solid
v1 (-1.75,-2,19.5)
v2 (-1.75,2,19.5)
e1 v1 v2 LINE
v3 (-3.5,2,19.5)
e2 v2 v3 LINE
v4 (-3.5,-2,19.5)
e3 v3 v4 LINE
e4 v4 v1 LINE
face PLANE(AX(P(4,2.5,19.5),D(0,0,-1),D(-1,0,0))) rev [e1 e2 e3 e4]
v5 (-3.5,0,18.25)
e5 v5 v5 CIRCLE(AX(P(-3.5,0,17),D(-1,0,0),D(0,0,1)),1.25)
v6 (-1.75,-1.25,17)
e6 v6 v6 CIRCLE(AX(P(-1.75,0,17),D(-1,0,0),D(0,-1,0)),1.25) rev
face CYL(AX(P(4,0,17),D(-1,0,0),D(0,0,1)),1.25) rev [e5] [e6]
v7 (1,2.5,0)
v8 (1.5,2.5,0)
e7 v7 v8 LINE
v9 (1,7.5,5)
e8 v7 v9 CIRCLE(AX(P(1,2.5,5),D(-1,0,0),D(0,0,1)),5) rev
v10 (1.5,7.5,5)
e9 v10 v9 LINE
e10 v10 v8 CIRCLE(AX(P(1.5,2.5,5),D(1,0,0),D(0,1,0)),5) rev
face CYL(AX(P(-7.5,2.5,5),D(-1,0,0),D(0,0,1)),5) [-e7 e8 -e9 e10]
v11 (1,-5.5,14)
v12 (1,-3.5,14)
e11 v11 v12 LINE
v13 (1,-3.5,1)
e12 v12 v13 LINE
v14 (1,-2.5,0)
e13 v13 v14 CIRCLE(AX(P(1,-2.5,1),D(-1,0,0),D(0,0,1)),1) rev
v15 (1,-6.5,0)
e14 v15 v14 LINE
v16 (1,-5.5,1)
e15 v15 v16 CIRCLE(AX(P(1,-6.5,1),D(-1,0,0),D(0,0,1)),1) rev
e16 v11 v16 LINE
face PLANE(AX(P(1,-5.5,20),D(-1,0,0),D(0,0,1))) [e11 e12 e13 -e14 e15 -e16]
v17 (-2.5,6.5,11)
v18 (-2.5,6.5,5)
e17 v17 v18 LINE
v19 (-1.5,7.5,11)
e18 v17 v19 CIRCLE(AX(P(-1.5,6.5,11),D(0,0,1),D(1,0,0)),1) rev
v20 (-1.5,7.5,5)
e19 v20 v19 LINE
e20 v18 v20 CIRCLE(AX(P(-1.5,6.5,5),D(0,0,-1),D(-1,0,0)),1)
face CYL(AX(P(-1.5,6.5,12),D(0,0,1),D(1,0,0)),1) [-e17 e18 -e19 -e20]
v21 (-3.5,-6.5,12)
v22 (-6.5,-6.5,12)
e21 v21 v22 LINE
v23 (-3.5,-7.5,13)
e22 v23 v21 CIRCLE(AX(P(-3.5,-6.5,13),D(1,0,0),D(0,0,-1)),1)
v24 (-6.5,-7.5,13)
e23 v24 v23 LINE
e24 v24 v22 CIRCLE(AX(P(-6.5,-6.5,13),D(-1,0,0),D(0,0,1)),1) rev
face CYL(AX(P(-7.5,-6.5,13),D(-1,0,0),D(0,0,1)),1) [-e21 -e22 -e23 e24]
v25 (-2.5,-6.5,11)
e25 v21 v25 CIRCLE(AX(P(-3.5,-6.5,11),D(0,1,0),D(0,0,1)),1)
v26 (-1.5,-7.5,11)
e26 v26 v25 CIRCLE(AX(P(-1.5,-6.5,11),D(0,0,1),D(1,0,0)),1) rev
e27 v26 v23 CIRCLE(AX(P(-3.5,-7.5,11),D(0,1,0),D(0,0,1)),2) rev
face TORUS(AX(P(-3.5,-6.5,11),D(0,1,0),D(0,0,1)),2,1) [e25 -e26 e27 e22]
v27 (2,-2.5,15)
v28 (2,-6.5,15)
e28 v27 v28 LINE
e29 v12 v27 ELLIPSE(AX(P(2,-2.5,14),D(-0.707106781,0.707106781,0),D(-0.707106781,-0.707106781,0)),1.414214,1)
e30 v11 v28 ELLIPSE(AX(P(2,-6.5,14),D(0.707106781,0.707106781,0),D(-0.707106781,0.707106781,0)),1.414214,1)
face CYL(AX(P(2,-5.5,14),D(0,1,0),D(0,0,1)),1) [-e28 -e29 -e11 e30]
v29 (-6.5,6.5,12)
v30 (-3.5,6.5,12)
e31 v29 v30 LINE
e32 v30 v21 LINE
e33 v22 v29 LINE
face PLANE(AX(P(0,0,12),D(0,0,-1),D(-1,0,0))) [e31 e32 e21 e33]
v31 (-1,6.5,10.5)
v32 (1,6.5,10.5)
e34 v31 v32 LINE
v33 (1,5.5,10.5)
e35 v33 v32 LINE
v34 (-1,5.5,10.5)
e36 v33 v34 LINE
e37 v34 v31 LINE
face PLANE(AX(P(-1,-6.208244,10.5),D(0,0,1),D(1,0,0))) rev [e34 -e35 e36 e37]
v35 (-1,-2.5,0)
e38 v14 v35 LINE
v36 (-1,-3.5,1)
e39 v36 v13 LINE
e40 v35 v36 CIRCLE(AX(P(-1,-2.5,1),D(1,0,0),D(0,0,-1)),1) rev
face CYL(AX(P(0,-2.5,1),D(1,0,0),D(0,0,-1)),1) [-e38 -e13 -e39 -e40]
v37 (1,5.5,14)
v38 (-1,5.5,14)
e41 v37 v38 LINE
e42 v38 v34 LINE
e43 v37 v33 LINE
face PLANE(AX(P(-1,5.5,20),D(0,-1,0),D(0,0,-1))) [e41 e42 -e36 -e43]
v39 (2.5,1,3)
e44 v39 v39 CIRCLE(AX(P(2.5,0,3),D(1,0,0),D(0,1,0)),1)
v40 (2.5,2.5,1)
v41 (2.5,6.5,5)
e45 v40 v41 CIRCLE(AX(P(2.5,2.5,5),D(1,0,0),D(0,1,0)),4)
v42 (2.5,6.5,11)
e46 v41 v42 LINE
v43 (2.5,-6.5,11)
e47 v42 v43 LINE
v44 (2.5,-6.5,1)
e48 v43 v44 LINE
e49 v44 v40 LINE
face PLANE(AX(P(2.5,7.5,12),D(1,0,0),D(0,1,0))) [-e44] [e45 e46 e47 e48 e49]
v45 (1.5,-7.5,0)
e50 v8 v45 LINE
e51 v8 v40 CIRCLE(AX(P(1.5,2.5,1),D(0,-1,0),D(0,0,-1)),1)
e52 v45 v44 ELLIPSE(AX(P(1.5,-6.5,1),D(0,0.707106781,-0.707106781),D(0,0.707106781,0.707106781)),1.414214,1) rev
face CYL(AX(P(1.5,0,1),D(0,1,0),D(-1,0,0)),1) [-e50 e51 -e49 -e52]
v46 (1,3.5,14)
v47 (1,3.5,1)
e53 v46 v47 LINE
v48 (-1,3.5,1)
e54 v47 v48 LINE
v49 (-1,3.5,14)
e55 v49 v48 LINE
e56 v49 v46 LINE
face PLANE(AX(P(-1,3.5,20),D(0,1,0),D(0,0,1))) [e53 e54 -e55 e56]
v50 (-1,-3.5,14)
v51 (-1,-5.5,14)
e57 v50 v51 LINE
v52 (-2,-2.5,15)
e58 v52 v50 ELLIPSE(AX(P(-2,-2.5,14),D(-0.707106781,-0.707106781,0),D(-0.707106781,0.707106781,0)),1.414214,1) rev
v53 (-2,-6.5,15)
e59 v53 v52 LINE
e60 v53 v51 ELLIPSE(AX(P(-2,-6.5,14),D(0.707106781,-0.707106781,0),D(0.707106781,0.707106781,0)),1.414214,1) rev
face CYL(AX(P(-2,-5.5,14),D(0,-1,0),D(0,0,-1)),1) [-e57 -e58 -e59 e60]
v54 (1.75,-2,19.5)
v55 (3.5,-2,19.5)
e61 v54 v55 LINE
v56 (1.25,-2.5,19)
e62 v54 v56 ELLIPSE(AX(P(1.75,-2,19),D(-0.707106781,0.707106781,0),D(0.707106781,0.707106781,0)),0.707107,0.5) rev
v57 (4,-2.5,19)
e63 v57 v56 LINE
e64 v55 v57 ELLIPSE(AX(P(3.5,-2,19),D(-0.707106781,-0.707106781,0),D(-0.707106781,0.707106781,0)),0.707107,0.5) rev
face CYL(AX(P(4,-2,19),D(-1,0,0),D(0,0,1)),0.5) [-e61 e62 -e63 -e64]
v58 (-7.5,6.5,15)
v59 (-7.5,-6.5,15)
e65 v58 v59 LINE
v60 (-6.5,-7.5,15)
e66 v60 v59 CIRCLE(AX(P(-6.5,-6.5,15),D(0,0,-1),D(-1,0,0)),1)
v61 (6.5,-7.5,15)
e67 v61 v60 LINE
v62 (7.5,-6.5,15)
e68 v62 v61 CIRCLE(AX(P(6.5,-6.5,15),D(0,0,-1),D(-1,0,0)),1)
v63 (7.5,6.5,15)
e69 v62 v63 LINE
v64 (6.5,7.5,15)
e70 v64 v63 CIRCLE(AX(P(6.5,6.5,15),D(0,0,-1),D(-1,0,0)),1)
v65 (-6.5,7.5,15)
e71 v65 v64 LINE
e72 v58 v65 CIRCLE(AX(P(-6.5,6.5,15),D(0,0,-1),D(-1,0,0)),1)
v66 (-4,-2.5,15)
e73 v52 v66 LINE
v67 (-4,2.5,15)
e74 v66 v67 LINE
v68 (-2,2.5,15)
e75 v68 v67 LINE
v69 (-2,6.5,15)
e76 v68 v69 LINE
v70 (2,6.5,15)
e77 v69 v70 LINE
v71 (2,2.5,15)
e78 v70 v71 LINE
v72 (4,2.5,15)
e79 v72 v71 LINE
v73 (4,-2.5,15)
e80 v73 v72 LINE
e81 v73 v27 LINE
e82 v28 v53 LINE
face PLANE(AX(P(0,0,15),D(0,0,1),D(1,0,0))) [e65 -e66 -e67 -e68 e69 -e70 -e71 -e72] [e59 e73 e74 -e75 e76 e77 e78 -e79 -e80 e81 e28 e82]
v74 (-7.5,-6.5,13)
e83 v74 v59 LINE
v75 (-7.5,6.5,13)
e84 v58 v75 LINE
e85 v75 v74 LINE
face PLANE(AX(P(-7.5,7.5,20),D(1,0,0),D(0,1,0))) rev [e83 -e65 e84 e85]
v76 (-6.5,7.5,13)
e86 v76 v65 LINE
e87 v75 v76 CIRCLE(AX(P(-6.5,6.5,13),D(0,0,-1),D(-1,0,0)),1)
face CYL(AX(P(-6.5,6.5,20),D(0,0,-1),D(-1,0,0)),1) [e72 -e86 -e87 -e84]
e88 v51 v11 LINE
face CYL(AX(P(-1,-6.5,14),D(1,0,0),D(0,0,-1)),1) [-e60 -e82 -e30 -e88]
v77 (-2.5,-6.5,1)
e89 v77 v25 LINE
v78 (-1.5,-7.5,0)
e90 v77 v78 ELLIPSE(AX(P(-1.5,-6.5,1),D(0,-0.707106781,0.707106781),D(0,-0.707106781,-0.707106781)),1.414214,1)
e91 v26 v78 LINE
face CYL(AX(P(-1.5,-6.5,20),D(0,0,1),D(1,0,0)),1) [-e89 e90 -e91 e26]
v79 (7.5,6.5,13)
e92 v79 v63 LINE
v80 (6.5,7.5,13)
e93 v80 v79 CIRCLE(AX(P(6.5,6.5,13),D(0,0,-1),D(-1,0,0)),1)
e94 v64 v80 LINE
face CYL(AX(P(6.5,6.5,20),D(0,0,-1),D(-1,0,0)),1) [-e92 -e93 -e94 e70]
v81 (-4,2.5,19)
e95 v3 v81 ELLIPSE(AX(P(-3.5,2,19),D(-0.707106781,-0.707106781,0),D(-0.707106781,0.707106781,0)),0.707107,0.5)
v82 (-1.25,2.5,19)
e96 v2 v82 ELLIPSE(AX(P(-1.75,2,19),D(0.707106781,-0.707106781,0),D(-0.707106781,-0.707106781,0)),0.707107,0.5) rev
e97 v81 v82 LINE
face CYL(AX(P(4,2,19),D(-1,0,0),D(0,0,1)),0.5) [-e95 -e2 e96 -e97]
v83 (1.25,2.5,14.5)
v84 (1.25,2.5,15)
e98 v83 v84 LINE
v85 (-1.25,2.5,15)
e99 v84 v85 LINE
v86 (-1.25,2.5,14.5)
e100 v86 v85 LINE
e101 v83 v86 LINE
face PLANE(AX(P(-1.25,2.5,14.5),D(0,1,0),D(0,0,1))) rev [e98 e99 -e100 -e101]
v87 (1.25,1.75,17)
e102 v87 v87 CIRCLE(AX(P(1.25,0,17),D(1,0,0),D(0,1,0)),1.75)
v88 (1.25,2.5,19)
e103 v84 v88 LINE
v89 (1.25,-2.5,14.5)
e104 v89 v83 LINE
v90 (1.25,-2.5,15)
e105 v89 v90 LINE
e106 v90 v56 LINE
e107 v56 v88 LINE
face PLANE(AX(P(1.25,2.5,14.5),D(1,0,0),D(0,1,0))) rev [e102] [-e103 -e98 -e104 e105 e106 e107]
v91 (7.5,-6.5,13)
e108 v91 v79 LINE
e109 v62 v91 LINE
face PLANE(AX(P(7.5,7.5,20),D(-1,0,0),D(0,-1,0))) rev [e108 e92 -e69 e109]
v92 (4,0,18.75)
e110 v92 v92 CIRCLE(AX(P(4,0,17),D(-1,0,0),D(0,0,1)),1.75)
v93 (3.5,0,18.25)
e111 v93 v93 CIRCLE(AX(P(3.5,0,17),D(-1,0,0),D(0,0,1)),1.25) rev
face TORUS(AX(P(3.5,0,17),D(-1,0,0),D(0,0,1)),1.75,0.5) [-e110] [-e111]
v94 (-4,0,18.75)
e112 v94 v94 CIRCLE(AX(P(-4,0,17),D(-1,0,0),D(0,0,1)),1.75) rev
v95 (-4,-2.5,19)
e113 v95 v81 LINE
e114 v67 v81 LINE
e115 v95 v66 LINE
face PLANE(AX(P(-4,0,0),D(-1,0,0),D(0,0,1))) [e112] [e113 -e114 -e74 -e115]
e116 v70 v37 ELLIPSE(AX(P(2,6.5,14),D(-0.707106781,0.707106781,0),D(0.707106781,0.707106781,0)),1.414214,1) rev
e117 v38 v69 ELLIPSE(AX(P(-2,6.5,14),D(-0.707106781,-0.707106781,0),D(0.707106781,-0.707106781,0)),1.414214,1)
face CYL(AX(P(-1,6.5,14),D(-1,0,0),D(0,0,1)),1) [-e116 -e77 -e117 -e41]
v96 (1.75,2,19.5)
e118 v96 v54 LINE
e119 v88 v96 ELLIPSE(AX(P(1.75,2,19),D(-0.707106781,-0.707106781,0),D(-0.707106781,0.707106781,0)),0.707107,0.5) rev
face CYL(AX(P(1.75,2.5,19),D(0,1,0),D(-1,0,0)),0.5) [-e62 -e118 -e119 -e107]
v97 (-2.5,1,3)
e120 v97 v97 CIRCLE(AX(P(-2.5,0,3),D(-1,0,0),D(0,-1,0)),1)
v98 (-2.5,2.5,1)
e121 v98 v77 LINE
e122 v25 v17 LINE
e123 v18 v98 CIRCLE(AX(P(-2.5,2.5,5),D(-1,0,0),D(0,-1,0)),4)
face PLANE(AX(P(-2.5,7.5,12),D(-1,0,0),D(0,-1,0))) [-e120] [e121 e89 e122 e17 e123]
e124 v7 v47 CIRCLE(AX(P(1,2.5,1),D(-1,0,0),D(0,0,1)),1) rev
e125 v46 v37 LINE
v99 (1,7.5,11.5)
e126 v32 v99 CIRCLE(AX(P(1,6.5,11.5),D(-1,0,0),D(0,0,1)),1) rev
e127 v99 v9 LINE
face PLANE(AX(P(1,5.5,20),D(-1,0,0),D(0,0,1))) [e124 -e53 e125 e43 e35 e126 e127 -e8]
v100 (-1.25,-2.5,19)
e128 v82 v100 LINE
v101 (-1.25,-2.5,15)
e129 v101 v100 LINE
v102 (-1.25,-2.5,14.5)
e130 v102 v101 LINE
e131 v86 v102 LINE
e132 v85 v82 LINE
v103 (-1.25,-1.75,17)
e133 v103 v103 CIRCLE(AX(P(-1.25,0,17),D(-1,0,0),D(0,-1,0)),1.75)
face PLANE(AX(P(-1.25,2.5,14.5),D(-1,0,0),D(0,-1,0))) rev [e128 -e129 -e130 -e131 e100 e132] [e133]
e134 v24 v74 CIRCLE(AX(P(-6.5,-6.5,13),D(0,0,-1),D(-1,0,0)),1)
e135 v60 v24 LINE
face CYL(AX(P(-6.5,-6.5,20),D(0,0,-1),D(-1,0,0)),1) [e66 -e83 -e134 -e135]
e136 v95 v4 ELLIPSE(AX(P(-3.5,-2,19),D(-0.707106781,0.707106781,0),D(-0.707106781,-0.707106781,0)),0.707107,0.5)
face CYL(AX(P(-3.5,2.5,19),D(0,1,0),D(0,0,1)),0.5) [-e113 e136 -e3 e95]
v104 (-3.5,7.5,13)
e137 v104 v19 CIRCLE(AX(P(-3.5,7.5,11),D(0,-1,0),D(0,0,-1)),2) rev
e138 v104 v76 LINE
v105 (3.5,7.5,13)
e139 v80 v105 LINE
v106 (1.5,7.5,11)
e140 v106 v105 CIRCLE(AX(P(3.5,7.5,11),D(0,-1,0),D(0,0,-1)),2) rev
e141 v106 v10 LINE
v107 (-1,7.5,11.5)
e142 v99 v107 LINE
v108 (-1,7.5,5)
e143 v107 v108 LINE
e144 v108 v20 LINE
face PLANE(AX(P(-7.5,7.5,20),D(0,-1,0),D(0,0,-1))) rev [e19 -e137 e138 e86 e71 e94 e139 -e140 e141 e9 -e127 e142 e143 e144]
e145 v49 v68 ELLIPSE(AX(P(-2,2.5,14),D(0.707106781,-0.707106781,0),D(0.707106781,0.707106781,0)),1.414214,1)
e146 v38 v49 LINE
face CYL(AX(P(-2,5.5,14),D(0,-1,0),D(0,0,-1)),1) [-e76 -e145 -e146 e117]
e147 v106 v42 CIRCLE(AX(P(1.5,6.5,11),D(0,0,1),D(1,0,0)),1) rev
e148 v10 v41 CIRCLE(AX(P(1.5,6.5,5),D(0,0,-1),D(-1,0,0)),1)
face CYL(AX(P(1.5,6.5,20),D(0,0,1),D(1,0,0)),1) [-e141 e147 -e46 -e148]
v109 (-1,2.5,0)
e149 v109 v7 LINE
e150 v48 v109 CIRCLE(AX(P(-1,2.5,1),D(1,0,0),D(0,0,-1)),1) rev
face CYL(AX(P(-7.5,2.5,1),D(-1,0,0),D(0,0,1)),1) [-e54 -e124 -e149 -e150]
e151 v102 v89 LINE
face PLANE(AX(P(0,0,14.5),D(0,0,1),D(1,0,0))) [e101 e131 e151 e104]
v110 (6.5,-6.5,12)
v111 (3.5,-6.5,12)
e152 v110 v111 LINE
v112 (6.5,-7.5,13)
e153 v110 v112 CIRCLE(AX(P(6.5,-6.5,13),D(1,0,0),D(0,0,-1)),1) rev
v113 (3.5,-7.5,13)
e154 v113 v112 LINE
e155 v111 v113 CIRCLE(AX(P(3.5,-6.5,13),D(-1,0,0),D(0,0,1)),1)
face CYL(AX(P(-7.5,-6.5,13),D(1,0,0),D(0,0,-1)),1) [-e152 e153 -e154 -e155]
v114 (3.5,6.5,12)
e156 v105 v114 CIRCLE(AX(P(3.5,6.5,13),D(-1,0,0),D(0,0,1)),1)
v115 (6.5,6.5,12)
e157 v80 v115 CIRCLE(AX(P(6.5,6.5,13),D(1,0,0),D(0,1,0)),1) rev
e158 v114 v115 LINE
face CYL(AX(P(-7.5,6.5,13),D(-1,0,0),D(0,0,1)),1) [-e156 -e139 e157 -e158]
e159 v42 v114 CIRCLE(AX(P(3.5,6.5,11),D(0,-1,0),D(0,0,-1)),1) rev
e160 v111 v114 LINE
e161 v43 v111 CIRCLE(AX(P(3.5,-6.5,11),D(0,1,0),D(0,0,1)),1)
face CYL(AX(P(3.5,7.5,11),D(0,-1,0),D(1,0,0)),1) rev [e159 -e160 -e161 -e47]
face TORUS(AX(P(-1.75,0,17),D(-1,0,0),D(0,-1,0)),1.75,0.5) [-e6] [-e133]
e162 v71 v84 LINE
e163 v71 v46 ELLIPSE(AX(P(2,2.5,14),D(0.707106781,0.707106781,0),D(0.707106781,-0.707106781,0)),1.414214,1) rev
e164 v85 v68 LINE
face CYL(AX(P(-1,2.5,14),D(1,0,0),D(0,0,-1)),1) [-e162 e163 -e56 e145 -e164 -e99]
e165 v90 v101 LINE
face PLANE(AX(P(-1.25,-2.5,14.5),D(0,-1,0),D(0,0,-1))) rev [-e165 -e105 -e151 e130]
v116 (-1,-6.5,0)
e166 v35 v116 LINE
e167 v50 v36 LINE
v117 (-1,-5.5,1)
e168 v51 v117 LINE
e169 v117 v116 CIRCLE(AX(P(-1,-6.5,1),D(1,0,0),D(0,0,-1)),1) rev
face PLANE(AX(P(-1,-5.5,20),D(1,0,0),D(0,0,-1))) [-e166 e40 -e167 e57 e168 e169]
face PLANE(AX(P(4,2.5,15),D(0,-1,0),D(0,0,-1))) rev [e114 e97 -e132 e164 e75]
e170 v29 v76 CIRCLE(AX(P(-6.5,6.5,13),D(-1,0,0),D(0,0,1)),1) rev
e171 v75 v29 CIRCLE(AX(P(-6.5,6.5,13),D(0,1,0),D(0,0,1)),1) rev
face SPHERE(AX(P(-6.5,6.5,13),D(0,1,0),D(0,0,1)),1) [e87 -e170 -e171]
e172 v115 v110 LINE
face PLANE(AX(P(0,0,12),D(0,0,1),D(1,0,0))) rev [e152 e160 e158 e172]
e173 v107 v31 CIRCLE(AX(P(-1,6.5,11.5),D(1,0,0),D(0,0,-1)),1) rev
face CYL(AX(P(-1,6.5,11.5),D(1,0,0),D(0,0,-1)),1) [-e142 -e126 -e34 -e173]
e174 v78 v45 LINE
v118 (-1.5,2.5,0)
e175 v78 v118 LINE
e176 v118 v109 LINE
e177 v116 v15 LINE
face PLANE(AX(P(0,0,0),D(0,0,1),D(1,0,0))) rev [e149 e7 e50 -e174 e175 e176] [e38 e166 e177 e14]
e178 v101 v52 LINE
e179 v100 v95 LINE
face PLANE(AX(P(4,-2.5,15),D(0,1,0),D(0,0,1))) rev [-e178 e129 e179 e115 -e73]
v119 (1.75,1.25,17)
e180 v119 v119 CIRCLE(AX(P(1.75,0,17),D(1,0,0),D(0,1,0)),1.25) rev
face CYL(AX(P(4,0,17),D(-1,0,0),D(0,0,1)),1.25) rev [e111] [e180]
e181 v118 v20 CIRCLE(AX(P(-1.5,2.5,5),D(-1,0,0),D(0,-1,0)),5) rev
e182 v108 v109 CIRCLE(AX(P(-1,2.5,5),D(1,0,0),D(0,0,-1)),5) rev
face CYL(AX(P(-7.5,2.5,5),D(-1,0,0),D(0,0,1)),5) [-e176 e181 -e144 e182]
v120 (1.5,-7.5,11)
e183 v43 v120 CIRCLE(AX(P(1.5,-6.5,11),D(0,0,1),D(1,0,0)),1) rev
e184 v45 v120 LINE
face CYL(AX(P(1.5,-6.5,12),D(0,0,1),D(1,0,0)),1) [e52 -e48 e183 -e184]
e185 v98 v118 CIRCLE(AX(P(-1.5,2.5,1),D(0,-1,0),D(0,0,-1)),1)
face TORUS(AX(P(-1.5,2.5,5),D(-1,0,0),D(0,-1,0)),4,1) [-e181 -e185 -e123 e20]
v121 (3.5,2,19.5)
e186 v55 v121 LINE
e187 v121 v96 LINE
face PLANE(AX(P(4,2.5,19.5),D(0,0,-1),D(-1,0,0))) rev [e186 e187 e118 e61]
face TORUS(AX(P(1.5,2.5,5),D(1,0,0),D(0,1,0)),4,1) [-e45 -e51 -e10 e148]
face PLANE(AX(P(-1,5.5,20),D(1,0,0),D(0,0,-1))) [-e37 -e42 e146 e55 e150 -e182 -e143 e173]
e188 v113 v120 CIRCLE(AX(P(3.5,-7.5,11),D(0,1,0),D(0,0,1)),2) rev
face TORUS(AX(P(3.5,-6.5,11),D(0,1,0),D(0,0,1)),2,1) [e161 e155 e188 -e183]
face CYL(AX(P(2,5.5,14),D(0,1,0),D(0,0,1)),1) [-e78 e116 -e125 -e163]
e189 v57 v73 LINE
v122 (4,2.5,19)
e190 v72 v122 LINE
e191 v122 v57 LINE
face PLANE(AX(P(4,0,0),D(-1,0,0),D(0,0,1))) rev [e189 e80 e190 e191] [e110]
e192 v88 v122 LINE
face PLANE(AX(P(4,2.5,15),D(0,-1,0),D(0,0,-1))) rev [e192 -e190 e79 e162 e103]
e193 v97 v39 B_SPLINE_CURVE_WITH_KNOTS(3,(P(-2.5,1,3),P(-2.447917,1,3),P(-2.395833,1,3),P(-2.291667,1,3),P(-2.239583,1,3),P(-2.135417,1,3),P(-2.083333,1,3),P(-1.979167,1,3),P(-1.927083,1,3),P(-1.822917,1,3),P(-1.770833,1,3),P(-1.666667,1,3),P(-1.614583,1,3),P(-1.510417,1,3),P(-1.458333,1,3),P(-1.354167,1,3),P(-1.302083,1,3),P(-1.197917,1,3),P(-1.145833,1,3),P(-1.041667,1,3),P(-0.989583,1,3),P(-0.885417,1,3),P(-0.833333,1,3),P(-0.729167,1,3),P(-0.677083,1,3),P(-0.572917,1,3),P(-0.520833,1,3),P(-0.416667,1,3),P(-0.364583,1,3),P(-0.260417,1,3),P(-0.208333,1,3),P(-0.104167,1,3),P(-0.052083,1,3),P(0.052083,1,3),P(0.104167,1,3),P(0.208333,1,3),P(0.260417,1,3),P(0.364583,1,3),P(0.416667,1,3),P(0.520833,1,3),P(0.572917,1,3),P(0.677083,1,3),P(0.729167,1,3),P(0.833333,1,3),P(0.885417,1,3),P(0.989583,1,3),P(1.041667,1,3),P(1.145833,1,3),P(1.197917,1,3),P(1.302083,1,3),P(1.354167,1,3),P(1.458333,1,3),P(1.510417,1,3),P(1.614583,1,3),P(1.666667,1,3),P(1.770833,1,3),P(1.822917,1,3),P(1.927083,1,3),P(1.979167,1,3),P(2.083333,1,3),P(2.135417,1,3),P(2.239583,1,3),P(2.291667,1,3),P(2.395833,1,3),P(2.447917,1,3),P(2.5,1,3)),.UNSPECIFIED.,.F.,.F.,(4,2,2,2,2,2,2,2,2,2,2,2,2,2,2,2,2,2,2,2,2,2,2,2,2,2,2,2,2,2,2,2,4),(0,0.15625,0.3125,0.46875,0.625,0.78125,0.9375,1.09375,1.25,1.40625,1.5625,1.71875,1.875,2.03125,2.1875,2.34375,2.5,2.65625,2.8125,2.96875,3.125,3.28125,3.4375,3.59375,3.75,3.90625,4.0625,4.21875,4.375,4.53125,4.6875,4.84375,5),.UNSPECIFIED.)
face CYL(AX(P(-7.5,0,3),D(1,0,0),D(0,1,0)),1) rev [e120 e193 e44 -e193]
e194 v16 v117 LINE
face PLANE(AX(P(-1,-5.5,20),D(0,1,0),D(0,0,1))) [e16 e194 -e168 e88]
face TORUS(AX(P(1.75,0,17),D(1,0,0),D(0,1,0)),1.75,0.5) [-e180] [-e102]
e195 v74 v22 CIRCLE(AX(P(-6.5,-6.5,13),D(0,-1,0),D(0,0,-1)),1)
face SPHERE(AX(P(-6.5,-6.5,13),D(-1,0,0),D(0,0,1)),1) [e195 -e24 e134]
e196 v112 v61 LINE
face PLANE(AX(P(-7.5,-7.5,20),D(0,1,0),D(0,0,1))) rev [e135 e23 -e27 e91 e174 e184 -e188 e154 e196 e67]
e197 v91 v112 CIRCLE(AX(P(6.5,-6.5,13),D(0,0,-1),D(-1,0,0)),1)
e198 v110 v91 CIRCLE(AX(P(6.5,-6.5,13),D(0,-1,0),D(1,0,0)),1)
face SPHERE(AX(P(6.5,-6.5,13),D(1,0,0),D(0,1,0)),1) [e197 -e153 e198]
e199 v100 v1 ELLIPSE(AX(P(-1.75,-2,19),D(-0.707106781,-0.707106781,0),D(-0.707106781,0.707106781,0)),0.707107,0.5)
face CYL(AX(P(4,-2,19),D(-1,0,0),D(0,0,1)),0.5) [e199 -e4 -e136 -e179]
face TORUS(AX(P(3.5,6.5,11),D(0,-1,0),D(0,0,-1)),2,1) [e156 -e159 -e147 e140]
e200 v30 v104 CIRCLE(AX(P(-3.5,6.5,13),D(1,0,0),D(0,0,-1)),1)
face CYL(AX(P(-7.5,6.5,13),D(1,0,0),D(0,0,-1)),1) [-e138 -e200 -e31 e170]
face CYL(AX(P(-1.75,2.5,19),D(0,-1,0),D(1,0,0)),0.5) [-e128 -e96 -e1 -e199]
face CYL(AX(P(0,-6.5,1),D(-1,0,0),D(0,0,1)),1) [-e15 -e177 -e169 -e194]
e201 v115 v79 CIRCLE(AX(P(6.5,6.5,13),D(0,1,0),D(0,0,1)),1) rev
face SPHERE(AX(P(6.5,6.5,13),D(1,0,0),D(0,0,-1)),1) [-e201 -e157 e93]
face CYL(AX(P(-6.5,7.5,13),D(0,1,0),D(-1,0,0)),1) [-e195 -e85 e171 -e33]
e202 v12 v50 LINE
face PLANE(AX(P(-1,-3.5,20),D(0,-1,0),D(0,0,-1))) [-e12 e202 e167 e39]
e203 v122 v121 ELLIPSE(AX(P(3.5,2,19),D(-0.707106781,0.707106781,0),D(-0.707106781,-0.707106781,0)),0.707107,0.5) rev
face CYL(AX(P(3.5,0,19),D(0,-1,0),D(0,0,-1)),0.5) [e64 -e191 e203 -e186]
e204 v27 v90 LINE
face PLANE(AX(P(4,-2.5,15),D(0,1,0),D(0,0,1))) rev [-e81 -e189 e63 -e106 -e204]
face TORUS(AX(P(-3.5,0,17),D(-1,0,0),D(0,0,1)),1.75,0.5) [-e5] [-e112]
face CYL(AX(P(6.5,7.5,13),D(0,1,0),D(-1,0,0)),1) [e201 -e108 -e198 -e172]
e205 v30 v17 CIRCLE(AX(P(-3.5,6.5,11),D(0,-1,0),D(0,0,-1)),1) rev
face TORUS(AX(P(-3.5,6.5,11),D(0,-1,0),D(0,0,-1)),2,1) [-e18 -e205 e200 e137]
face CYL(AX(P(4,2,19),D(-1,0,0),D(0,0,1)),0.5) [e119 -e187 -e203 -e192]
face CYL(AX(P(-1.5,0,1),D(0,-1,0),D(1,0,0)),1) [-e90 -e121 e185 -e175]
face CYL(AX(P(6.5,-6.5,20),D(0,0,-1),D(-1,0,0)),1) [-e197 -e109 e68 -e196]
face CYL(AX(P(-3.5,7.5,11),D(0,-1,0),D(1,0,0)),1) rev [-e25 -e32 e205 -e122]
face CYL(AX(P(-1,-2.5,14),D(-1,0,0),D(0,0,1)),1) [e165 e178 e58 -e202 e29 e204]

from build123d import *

# Parameters (mm, degrees)
BASE_SKETCH_W                        = 15
BASE_SKETCH_H                        = 15
BASE_SKETCH_EXTRUDE_DEPTH            = 20
NUB_CUTOUT_SKETCH_W                  = 5
NUB_CUTOUT_SKETCH_H                  = 15
NUB_EXTRUDED_CUT_DEPTH               = 12
HING_E_HOLE_SKETCH_R                 = 1
HINGE_HOLE_EXTRUDED_CUT_DEPTH        = 27.100766272
CORNER_FILLETS_R                     = 5
STYLE_FILLETS_R                      = 1
ROUTING_HOLES_SKETCH_W               = 2
ROUTING_HOLES_SKETCH_H               = 2
ROUTING_HOLES_EXTRUDED_CUT_DEPTH     = 23.638462845
TIE_DOWN_SKETCH_W                    = 4.5
TIE_DOWN_SKETCH_H                    = 5
TIE_DOWN_SKETCH_R                    = 1.25
TIE_DOWN_EXTRUDE_DEPTH               = 4
TIE_DOWN_CUTOUT_SKETCH_W             = 2.5
TIE_DOWN_CUTOUT_SKETCH_H             = 5
TIE_DOWN_CUTOUT_EXTRUDED_CUT_DEPTH   = 5
TIE_DOWN_FILLETS_R                   = 0.5
ROUTING_EXTENSION_SKETCH_W           = 2
ROUTING_EXTENSION_SKETCH_H           = 9.5
ROUTING_EXTENSION_EXTRUDED_CUT_DEPTH = 4
ROUTING_FILLETS_R                    = 1


with BuildPart() as part:
    # Base Sketch → Base Sketch Extrude (new body)
    with BuildSketch(Plane.XY):
        Rectangle(BASE_SKETCH_W, BASE_SKETCH_H)
    extrude(amount=BASE_SKETCH_EXTRUDE_DEPTH)

    # Nub Cutout Sketch → Nub Extruded Cut (cut)
    with BuildSketch(Plane.XY):
        with Locations((5, 0)):
            Rectangle(NUB_CUTOUT_SKETCH_W, NUB_CUTOUT_SKETCH_H)
        with Locations((-5, 0)):
            Rectangle(NUB_CUTOUT_SKETCH_W, NUB_CUTOUT_SKETCH_H)
    extrude(amount=NUB_EXTRUDED_CUT_DEPTH, mode=Mode.SUBTRACT)

    # Hing e Hole Sketch → Hinge Hole Extruded Cut (cut, through all)
    with BuildSketch(Plane(origin=(7.5, 0, 0), x_dir=(0, 0, -1), z_dir=(1, 0, 0))):
        with Locations(Location((-3, 0, 0), (0, 0, 90))):
            Circle(HING_E_HOLE_SKETCH_R)
    extrude(amount=-HINGE_HOLE_EXTRUDED_CUT_DEPTH, mode=Mode.SUBTRACT)

    # Corner Fillets
    corner_fillets_edges = [part.edges().sort_by_distance(p)[0] for p in [
        (0, 7.5, 0),
        (0, -7.5, 20),
        (0, 7.5, 20),
    ]]
    fillet(corner_fillets_edges, radius=CORNER_FILLETS_R)

    # Style Fillets
    style_fillets_edges = [part.edges().sort_by_distance(p)[0] for p in [
        (2.5, 7.5, 8.5),
        (2.5, -7.5, 6),
        (2.5, 0, 12),
        (5, -7.5, 12),
        (7.5, 0, 12),
        (5, 7.5, 12),
        (-2.5, -2.5, 0),
        (-2.5, -7.5, 6),
        (-2.5, 7.5, 8.5),
        (-2.5, 0, 12),
        (-5, 7.5, 12),
        (-7.5, 0, 12),
        (-5, -7.5, 12),
        (7.5, 0, 20),
        (-7.5, 0, 20),
        (7.5, -7.5, 13.5),
        (7.5, 7.5, 13.5),
        (7.5, 6.035533906, 18.535533906),
        (7.5, -6.035533906, 18.535533906),
        (-7.5, -7.5, 13.5),
        (-7.5, 7.5, 13.5),
        (-7.5, 6.035533906, 18.535533906),
        (-7.5, -6.035533906, 18.535533906),
        (-2.5, 6.035533906, 1.464466094),
        (2.5, -2.5, 0),
        (2.5, 6.035533906, 1.464466094),
    ]]
    fillet(style_fillets_edges, radius=STYLE_FILLETS_R)

    # Routing Holes Sketch → Routing Holes EXtruded Cut (cut, through all)
    with BuildSketch(Plane.XY):
        with Locations((0, 4.5)):
            Rectangle(ROUTING_HOLES_SKETCH_W, ROUTING_HOLES_SKETCH_H)
        with Locations((0, -4.5)):
            Rectangle(ROUTING_HOLES_SKETCH_W, ROUTING_HOLES_SKETCH_H)
    extrude(amount=ROUTING_HOLES_EXTRUDED_CUT_DEPTH, mode=Mode.SUBTRACT)

    # Split1
    split(bisect_by=Plane.XY.offset(15), keep=Keep.BOTTOM)

    # Tie Down Sketch → Tie Down Extrude (add, symmetric)
    with BuildSketch(Plane(origin=(0, 0, 0), x_dir=(0, 0, -1), z_dir=(1, 0, 0))):
        with Locations((-17.25, 0)):
            Rectangle(TIE_DOWN_SKETCH_W, TIE_DOWN_SKETCH_H)
        with Locations((-17, 0)):
            Circle(TIE_DOWN_SKETCH_R, mode=Mode.SUBTRACT)
    extrude(amount=TIE_DOWN_EXTRUDE_DEPTH, both=True)

    # Tie Down Cutout Sketch → Tie Down Cutout Extruded Cut (cut)
    with BuildSketch(Plane.XY.offset(19.5)):
        Rectangle(TIE_DOWN_CUTOUT_SKETCH_W, TIE_DOWN_CUTOUT_SKETCH_H)
    extrude(amount=-TIE_DOWN_CUTOUT_EXTRUDED_CUT_DEPTH, mode=Mode.SUBTRACT)

    # Tie Down Fillets
    tie_down_fillets_edges = [part.edges().sort_by_distance(p)[0] for p in [
        (-2.625, 2.5, 19.5),
        (-1.25, 0, 18.25),
        (1.25, 0, 18.25),
        (-1.25, 0, 19.5),
        (1.25, 0, 19.5),
        (4, 0, 19.5),
        (-4, 0, 18.25),
        (-4, 0, 19.5),
        (2.625, 2.5, 19.5),
        (2.625, -2.5, 19.5),
        (4, 0, 18.25),
        (-2.625, -2.5, 19.5),
    ]]
    fillet(tie_down_fillets_edges, radius=TIE_DOWN_FILLETS_R)

    # Routing Extension Sketch → Routing Extension Extruded Cut (cut)
    with BuildSketch(Plane(origin=(0, 7.5, 0), x_dir=(1, 0, 0), z_dir=(0, 1, 0))):
        with Locations((0, -5.75)):
            Rectangle(ROUTING_EXTENSION_SKETCH_W, ROUTING_EXTENSION_SKETCH_H)
    extrude(amount=-ROUTING_EXTENSION_EXTRUDED_CUT_DEPTH, mode=Mode.SUBTRACT)

    # Routing Fillets
    routing_fillets_edges = [part.edges().sort_by_distance(p)[0] for p in [
        (0, 7.5, 10.5),
        (0, -3.5, 0),
        (0, -5.5, 0),
        (0, 3.5, 0.101020514),
        (-1, -4.5, 15),
        (0, -3.5, 15),
        (1, -4.5, 15),
        (0, -5.5, 15),
        (0, 5.5, 15),
        (1, 4.5, 15),
        (0, 3.5, 15),
        (-1, 4.5, 15),
    ]]
    fillet(routing_fillets_edges, radius=ROUTING_FILLETS_R - 0.0001)  # a hair under: the kernel refuses the full size


solid = part.part
